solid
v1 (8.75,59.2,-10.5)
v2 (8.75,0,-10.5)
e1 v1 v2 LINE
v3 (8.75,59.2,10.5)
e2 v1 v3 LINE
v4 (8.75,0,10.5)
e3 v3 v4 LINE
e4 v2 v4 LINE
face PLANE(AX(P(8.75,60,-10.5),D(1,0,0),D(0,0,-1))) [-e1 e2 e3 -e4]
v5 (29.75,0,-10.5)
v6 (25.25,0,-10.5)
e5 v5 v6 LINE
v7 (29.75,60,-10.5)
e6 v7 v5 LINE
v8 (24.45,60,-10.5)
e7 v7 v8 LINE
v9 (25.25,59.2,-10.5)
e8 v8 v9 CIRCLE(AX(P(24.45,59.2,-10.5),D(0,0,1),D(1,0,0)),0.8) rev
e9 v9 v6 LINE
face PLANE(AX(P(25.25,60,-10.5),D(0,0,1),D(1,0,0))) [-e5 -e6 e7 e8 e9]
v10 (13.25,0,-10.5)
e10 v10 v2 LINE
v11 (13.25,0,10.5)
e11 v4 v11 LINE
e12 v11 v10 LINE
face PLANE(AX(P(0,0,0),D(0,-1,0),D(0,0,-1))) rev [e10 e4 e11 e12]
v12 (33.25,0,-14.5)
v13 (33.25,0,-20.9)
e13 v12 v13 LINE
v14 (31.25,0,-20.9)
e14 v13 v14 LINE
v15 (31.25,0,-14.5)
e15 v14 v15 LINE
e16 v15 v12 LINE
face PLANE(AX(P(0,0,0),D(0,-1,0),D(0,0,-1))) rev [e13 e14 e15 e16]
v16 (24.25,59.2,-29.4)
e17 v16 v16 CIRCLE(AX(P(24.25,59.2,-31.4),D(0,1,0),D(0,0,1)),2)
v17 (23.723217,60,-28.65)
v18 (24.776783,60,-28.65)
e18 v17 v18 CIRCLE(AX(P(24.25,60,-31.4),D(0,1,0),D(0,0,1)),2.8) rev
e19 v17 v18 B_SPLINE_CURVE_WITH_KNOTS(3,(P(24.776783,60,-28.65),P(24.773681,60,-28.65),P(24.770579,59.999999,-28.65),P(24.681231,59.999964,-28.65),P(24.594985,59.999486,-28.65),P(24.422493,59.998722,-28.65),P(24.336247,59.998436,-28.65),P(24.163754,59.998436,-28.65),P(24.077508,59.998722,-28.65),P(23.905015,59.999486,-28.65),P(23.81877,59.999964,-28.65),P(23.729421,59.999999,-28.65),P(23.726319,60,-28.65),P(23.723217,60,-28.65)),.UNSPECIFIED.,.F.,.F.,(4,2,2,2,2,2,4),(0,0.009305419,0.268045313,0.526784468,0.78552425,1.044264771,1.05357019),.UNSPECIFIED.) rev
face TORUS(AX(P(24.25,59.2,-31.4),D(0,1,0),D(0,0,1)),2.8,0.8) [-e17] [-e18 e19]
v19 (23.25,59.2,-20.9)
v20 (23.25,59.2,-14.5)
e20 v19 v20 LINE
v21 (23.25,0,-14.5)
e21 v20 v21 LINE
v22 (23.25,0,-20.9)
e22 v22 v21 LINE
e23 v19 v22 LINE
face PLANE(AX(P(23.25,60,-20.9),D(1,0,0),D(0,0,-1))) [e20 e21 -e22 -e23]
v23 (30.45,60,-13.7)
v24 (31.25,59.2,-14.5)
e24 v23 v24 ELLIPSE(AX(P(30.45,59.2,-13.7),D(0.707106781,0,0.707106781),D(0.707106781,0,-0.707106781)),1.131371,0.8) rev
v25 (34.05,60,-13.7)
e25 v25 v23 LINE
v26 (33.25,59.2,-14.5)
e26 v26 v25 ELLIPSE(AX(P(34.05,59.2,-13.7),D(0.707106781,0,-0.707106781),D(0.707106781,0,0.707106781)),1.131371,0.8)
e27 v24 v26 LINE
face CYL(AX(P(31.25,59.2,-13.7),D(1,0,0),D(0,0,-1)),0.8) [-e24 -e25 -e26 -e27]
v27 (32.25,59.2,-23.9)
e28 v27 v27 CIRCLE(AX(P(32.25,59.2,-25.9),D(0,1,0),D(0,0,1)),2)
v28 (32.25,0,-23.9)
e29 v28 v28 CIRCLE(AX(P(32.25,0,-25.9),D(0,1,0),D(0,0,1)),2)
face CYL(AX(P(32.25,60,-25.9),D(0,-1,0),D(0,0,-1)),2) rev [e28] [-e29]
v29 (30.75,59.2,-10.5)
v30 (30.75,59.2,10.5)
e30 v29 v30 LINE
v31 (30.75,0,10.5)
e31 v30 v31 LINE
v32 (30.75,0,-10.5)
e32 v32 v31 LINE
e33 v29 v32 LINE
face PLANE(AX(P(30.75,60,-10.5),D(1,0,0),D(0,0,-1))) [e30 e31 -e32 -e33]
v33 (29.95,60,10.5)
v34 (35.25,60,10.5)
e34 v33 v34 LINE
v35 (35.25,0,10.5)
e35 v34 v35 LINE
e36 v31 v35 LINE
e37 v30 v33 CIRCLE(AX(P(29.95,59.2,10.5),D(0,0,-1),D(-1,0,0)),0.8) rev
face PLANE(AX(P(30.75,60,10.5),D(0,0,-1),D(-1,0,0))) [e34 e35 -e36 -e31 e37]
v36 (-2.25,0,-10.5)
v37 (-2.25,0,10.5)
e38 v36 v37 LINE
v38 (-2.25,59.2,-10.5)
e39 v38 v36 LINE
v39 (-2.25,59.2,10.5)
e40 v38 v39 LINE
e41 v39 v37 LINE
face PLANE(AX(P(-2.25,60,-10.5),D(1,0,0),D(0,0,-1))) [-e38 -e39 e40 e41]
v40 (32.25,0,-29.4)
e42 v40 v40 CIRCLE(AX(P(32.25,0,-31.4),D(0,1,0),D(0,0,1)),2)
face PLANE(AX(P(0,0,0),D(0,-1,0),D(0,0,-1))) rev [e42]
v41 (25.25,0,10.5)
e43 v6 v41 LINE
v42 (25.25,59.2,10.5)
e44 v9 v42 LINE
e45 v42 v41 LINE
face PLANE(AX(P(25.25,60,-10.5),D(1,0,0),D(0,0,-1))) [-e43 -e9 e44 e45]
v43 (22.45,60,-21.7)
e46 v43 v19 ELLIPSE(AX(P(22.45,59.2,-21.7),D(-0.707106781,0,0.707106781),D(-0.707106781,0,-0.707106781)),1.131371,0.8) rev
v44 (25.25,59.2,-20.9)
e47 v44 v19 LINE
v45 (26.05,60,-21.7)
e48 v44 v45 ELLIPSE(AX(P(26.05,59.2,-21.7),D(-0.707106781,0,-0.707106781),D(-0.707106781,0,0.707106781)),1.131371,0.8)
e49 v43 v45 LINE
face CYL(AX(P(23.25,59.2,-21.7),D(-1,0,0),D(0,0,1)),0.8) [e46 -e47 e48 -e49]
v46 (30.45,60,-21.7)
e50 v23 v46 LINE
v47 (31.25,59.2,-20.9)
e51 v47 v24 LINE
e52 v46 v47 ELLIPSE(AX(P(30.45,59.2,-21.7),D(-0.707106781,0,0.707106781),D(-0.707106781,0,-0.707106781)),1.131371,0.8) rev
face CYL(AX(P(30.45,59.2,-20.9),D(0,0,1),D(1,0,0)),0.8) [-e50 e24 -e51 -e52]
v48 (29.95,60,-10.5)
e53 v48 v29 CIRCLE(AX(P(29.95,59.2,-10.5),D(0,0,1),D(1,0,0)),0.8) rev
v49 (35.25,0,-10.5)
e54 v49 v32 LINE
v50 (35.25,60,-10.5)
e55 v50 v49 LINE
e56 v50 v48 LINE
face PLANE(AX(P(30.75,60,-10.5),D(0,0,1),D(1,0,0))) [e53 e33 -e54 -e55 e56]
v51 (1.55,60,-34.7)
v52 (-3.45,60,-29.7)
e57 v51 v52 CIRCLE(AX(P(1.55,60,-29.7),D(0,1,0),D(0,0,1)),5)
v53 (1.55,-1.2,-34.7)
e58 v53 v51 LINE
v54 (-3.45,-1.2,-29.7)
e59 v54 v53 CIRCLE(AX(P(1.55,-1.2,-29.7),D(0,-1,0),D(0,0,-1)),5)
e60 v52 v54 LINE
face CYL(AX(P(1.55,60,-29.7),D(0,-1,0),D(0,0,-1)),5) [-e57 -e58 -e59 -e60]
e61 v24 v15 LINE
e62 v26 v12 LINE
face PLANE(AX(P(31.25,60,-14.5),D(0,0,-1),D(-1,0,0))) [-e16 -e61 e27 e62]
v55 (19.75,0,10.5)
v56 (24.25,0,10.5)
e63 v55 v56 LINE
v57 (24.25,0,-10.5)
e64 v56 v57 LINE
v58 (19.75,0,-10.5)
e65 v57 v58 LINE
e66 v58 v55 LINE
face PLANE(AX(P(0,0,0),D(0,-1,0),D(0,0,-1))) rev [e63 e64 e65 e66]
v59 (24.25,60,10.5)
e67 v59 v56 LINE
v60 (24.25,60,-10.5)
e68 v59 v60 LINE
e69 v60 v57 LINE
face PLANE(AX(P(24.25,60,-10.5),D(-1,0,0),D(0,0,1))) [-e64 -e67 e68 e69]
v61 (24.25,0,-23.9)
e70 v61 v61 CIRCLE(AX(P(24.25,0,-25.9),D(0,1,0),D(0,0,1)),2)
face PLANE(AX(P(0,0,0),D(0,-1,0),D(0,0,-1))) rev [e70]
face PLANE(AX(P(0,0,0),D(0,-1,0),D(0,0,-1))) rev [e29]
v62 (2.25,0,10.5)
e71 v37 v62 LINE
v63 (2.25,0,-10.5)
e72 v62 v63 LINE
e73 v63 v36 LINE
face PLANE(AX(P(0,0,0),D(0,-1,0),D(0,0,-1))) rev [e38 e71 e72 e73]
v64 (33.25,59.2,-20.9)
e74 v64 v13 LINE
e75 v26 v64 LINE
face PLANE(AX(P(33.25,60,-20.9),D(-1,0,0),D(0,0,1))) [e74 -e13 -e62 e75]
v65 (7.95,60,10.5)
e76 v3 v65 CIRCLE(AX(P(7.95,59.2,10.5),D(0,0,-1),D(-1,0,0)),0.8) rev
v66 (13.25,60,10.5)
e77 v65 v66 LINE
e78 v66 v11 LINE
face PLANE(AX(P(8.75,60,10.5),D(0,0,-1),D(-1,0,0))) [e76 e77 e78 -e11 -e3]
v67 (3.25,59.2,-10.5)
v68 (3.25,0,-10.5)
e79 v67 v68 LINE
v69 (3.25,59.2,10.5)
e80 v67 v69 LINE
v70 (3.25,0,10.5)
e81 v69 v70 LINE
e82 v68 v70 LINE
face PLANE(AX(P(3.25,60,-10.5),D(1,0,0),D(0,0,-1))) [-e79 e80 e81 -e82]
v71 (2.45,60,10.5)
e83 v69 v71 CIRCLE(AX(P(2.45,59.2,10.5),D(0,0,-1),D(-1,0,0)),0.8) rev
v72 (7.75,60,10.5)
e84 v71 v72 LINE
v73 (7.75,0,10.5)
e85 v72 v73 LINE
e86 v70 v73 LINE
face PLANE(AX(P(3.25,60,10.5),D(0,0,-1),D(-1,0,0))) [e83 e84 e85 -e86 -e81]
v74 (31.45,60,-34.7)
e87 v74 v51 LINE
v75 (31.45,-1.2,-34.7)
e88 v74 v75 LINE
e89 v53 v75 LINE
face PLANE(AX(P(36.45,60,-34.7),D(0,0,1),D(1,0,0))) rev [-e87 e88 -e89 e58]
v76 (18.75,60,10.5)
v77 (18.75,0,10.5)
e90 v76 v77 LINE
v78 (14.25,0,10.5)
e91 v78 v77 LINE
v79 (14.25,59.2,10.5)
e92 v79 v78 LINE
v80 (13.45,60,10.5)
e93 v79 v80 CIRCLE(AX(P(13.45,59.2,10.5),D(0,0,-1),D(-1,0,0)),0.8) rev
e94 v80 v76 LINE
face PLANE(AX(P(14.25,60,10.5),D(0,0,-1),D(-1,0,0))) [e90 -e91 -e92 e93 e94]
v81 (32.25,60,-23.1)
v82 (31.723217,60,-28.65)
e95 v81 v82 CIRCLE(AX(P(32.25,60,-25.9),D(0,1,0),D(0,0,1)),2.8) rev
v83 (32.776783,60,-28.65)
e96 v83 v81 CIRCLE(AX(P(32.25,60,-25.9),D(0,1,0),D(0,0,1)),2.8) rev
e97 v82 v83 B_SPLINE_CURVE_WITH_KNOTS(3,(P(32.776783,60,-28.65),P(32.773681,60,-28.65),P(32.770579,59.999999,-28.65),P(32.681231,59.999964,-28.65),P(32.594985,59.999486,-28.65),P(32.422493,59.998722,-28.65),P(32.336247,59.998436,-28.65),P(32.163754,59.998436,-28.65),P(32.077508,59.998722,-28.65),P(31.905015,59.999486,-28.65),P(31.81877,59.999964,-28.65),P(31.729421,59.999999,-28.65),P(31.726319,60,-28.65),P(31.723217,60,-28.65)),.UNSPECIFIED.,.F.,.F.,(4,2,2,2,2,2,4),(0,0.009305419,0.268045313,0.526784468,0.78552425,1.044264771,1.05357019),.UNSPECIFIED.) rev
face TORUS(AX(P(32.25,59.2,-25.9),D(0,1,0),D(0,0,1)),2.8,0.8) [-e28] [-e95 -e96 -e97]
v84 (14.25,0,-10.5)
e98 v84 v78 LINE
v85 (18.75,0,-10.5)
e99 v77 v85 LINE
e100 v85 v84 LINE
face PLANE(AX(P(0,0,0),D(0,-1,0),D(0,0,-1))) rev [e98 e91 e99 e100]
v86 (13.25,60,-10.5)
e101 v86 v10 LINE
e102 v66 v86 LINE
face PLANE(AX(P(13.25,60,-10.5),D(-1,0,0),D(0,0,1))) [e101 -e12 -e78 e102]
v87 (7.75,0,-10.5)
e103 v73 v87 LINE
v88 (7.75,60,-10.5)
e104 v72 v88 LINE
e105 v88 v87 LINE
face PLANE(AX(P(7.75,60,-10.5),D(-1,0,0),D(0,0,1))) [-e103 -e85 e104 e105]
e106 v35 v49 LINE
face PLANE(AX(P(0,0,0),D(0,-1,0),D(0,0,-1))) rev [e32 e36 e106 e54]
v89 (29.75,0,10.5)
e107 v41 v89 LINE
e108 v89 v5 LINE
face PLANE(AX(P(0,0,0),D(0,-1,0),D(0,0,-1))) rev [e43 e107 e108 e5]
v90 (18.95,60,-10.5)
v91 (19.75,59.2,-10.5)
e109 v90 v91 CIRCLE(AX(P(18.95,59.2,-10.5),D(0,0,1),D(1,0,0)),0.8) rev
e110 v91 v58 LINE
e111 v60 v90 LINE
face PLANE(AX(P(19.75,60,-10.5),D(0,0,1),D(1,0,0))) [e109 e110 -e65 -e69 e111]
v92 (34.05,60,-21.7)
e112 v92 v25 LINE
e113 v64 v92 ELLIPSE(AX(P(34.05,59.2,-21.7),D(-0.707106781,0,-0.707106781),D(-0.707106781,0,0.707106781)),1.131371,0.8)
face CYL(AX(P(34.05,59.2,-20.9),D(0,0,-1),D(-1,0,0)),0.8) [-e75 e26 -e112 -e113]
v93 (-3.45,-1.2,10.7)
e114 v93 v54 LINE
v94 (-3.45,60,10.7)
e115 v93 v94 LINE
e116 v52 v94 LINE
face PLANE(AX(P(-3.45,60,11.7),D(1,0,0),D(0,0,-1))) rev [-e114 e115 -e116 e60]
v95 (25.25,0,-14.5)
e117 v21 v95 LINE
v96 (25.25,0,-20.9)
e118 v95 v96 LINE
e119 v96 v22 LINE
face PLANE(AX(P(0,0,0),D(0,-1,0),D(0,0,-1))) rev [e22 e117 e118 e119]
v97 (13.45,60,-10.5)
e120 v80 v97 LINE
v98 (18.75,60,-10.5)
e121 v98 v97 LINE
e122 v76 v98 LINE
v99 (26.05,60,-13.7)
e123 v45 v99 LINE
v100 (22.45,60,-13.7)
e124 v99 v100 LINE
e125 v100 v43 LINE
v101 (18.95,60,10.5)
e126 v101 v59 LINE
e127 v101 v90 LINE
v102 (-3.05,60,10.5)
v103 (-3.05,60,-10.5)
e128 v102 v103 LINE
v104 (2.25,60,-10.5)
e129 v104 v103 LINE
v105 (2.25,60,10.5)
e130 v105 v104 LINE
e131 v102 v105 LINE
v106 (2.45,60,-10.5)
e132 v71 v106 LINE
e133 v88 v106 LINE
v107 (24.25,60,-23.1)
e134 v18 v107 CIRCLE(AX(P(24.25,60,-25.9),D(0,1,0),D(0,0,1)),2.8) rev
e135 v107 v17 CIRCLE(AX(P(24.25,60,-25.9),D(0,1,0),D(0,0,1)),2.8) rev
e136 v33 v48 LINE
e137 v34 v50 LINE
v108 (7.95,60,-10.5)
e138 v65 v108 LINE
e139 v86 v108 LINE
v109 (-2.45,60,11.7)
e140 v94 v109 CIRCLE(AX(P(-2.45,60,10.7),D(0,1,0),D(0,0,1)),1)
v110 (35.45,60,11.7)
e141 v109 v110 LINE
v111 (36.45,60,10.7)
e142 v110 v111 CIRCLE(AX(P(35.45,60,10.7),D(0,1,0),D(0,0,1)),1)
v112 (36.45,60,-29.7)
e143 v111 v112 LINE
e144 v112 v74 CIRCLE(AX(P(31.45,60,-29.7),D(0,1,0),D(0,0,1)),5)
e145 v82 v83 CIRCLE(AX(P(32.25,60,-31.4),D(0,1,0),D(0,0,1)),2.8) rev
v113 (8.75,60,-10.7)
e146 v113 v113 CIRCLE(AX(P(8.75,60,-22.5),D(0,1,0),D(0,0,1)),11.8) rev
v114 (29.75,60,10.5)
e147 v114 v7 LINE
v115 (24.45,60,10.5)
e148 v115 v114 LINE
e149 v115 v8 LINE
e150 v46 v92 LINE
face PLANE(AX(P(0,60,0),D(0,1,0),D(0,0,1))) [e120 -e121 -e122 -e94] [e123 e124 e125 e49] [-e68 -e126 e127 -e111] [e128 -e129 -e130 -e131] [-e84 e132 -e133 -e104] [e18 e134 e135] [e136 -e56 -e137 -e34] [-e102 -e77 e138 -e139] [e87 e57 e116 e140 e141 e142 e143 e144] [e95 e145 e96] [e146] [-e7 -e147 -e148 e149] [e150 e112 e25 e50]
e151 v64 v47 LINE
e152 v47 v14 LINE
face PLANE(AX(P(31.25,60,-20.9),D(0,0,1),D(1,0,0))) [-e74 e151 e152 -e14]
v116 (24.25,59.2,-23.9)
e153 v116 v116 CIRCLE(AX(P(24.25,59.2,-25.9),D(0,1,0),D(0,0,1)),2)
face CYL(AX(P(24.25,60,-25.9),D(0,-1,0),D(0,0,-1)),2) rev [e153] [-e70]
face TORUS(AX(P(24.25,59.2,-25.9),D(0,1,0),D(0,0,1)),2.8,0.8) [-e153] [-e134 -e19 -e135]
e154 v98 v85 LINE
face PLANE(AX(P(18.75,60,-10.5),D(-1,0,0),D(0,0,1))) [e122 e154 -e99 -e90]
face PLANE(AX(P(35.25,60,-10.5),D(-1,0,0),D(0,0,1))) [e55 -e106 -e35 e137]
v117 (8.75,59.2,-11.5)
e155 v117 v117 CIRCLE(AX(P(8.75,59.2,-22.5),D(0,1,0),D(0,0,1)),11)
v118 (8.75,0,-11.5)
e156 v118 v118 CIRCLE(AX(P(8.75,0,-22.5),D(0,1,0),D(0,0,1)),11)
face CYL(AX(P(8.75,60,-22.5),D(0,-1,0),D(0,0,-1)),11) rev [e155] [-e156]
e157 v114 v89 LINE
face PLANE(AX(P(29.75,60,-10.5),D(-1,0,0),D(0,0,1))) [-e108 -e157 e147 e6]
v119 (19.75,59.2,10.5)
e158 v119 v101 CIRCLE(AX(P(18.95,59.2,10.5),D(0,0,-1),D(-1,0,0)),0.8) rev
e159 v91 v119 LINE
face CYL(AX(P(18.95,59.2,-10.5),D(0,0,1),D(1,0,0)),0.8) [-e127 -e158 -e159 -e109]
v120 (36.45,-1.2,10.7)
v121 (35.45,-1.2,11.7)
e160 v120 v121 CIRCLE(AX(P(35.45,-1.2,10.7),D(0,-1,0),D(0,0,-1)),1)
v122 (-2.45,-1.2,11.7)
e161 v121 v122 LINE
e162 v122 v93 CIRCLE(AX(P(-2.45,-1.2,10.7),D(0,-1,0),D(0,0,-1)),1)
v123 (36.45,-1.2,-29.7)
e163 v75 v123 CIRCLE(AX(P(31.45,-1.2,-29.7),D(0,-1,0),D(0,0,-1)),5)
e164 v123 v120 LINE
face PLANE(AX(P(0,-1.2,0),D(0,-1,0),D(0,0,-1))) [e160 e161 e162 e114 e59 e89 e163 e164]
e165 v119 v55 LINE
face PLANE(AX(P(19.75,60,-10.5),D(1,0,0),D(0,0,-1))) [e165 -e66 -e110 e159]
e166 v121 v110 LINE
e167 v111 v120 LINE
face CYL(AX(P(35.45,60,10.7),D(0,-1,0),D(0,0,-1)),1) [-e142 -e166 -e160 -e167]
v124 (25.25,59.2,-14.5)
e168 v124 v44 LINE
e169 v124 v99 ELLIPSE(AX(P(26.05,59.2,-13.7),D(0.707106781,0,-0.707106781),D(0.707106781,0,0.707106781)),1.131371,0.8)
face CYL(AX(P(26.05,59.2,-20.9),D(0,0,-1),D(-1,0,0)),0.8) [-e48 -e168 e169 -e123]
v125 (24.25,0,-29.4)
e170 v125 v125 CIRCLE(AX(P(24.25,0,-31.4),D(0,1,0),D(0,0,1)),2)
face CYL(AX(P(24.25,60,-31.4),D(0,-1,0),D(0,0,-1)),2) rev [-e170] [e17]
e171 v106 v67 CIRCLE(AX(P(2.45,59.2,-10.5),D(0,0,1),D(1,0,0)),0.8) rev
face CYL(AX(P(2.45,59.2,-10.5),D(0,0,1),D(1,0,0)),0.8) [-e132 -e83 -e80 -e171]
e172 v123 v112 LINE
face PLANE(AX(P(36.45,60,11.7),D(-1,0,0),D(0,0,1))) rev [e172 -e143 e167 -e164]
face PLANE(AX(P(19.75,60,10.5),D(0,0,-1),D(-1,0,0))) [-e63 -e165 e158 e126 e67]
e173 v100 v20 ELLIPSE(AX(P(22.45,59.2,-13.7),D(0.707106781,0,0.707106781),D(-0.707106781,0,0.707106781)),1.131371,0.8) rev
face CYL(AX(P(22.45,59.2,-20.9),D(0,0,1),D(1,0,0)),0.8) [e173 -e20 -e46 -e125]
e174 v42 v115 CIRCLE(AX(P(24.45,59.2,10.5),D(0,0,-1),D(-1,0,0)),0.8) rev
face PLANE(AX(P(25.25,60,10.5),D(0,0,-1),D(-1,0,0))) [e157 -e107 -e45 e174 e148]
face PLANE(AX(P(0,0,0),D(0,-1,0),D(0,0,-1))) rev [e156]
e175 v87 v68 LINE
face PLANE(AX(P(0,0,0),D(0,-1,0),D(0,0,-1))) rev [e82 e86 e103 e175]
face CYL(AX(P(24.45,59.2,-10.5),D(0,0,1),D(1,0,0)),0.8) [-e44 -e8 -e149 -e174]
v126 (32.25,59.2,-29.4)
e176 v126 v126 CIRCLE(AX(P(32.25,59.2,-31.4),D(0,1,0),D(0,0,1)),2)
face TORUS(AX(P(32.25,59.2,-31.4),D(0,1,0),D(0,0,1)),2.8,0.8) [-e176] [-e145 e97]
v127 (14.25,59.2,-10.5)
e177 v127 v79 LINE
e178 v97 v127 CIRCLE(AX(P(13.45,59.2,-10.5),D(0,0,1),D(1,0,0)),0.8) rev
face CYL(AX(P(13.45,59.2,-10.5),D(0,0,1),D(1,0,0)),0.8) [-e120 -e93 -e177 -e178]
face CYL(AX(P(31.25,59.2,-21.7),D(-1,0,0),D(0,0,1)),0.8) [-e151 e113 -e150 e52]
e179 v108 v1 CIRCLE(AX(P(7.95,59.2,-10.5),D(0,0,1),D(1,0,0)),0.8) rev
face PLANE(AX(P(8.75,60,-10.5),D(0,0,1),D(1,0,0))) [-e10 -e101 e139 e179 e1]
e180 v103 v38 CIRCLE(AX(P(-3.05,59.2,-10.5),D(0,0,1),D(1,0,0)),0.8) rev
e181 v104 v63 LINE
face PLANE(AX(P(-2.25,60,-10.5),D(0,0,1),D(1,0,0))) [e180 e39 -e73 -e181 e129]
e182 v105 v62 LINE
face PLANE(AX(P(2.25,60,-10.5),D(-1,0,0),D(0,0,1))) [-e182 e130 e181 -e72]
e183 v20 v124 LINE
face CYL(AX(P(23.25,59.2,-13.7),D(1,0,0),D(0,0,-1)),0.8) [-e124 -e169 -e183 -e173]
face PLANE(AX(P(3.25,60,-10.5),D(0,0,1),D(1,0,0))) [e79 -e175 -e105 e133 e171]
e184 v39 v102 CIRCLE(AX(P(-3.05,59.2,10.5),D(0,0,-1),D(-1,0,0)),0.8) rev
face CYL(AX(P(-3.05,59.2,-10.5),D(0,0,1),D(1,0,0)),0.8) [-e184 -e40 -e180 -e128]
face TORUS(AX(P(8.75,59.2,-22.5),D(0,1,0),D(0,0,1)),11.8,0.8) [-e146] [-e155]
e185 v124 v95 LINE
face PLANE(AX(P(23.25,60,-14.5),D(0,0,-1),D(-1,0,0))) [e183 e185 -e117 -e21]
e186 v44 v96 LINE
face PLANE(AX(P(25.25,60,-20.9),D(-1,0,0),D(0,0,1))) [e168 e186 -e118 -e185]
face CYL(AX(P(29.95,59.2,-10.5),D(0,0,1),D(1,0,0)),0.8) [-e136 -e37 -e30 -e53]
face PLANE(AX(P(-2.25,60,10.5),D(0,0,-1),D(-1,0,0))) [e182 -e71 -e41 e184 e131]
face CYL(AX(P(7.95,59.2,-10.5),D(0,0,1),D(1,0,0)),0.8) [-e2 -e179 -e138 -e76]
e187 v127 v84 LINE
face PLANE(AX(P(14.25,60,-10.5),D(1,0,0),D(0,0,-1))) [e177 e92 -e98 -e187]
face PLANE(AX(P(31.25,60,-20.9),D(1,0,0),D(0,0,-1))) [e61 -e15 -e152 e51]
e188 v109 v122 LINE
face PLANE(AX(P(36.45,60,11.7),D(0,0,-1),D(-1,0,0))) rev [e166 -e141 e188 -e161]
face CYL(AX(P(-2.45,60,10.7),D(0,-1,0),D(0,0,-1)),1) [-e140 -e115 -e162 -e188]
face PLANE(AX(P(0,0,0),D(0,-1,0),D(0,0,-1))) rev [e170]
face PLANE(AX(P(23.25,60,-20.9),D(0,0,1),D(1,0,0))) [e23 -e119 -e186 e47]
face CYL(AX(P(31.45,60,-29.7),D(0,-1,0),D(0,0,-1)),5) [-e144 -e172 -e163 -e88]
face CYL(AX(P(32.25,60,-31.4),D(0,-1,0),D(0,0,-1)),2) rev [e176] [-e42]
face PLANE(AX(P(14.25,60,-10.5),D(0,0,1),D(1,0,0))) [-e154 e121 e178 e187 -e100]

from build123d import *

# Parameters (mm, degrees)
SKETCH_1_W      = 39.9
SKETCH_1_H      = 46.4
SKETCH_1_R      = 11
SKETCH_1_R_2    = 2
SKETCH_1_W_2    = 4.5
SKETCH_1_H_2    = 21
SKETCH_1_W_3    = 2
SKETCH_1_H_3    = 6.4
EXTRUDE_1_DEPTH = 60
SKETCH_2_W      = 39.9
SKETCH_2_H      = 46.4
EXTRUDE_2_DEPTH = 1.2
FILLET_1_R      = 1
FILLET_2_R      = 5
FILLET_3_R      = 0.8


with BuildPart() as part:
    # 草图1 → 凸台-拉伸1 (new body)
    with BuildSketch(Plane(origin=(0, 0, 0), x_dir=(1, 0, 0), z_dir=(0, 1, 0))):
        with Locations((16.5, 11.5)):
            Rectangle(SKETCH_1_W, SKETCH_1_H)
        with Locations(Location((8.75, 22.5, 0), (0, 0, 270))):
            Circle(SKETCH_1_R, mode=Mode.SUBTRACT)
        with Locations(Location((24.25, 25.9, 0), (0, 0, 270))):
            Circle(SKETCH_1_R_2, mode=Mode.SUBTRACT)
        with Locations(Location((32.25, 25.9, 0), (0, 0, 270))):
            Circle(SKETCH_1_R_2, mode=Mode.SUBTRACT)
        with Locations(Location((24.25, 31.4, 0), (0, 0, 270))):
            Circle(SKETCH_1_R_2, mode=Mode.SUBTRACT)
        with Locations(Location((32.25, 31.4, 0), (0, 0, 270))):
            Circle(SKETCH_1_R_2, mode=Mode.SUBTRACT)
        with Locations((5.5, 0)):
            Rectangle(SKETCH_1_W_2, SKETCH_1_H_2, mode=Mode.SUBTRACT)
        Rectangle(SKETCH_1_W_2, SKETCH_1_H_2, mode=Mode.SUBTRACT)
        with Locations((11, 0)):
            Rectangle(SKETCH_1_W_2, SKETCH_1_H_2, mode=Mode.SUBTRACT)
        with Locations((16.5, 0)):
            Rectangle(SKETCH_1_W_2, SKETCH_1_H_2, mode=Mode.SUBTRACT)
        with Locations((22, 0)):
            Rectangle(SKETCH_1_W_2, SKETCH_1_H_2, mode=Mode.SUBTRACT)
        with Locations((27.5, 0)):
            Rectangle(SKETCH_1_W_2, SKETCH_1_H_2, mode=Mode.SUBTRACT)
        with Locations((24.25, 17.7)):
            Rectangle(SKETCH_1_W_3, SKETCH_1_H_3, mode=Mode.SUBTRACT)
        with Locations((33, 0)):
            Rectangle(SKETCH_1_W_2, SKETCH_1_H_2, mode=Mode.SUBTRACT)
        with Locations((32.25, 17.7)):
            Rectangle(SKETCH_1_W_3, SKETCH_1_H_3, mode=Mode.SUBTRACT)
    extrude(amount=EXTRUDE_1_DEPTH)

    # 草图2 → 凸台-拉伸2 (add)
    with BuildSketch(Plane.XZ):
        with Locations((16.5, -11.5)):
            Rectangle(SKETCH_2_W, SKETCH_2_H)
    extrude(amount=EXTRUDE_2_DEPTH)

    # 圆角1
    fillet_1_edges = [part.edges().sort_by_distance(p)[0] for p in [
        (36.45, 29.4, 11.7),
        (-3.45, 29.4, 11.7),
    ]]
    fillet(fillet_1_edges, radius=FILLET_1_R)

    # 圆角2
    fillet_2_edges = [part.edges().sort_by_distance(p)[0] for p in [
        (-3.45, 29.4, -34.7),
        (36.45, 29.4, -34.7),
    ]]
    fillet(fillet_2_edges, radius=FILLET_2_R)

    # 圆角3
    # the kernel refuses this fillet: 0.8 mm, written as the material it takes off along each edge
    with BuildSketch(Plane(origin=(31.25, 60, -14.5), x_dir=(-1, 0, 0), z_dir=(0, 0, -1)), Plane(origin=(33.25, 60, -20.9), x_dir=(1, 0, 0), z_dir=(0, 0, 1)), Plane(origin=(23.25, 60, -14.5), x_dir=(-1, 0, 0), z_dir=(0, 0, -1)), Plane(origin=(25.25, 60, -20.9), x_dir=(1, 0, 0), z_dir=(0, 0, 1))) as fillet_3_piece_1:
        with BuildLine():
            CenterArc((FILLET_3_R, -FILLET_3_R), FILLET_3_R, 90, 90)
            Line((0, -FILLET_3_R), (0, 0))
            Line((0, 0), (FILLET_3_R, 0))
        make_face()
    extrude(amount=6.4, mode=Mode.SUBTRACT)
    with BuildSketch(Plane(origin=(33.25, 60, -14.5), x_dir=(0, 0, 1), z_dir=(-1, 0, 0)), Plane(origin=(31.25, 60, -20.9), x_dir=(0, 0, -1), z_dir=(1, 0, 0)), Plane(origin=(25.25, 60, -14.5), x_dir=(0, 0, 1), z_dir=(-1, 0, 0)), Plane(origin=(23.25, 60, -20.9), x_dir=(0, 0, -1), z_dir=(1, 0, 0))) as fillet_3_piece_2:
        with BuildLine():
            CenterArc((FILLET_3_R, -FILLET_3_R), FILLET_3_R, 90, 90)
            Line((0, -FILLET_3_R), (0, 0))
            Line((0, 0), (FILLET_3_R, 0))
        make_face()
    extrude(amount=2, mode=Mode.SUBTRACT)
    with BuildSketch(Plane(origin=(24.25, 60, -25.9), x_dir=(0, 0, 1), z_dir=(-1, 0, 0))) as fillet_3_piece_3:
        with BuildLine():
            CenterArc((2 + FILLET_3_R, -FILLET_3_R), FILLET_3_R, 90, 90)
            Line((2, -FILLET_3_R), (2, 0))
            Line((2, 0), (2 + FILLET_3_R, 0))
        make_face()
    revolve(axis=Axis((24.25, 60, -25.9), (0, 1, 0)), mode=Mode.SUBTRACT)
    with BuildSketch(Plane(origin=(32.25, 60, -25.9), x_dir=(0, 0, 1), z_dir=(-1, 0, 0))) as fillet_3_piece_4:
        with BuildLine():
            CenterArc((2 + FILLET_3_R, -FILLET_3_R), FILLET_3_R, 90, 90)
            Line((2, -FILLET_3_R), (2, 0))
            Line((2, 0), (2 + FILLET_3_R, 0))
        make_face()
    revolve(axis=Axis((32.25, 60, -25.9), (0, 1, 0)), mode=Mode.SUBTRACT)
    with BuildSketch(Plane(origin=(30.75, 60, 10.5), x_dir=(-1, 0, 0), z_dir=(0, 0, -1)), Plane(origin=(-2.25, 60, 10.5), x_dir=(-1, 0, 0), z_dir=(0, 0, -1)), Plane(origin=(3.25, 60, 10.5), x_dir=(-1, 0, 0), z_dir=(0, 0, -1)), Plane(origin=(8.75, 60, 10.5), x_dir=(-1, 0, 0), z_dir=(0, 0, -1)), Plane(origin=(14.25, 60, 10.5), x_dir=(-1, 0, 0), z_dir=(0, 0, -1)), Plane(origin=(19.75, 60, 10.5), x_dir=(-1, 0, 0), z_dir=(0, 0, -1)), Plane(origin=(25.25, 60, 10.5), x_dir=(-1, 0, 0), z_dir=(0, 0, -1))) as fillet_3_piece_5:
        with BuildLine():
            CenterArc((FILLET_3_R, -FILLET_3_R), FILLET_3_R, 90, 90)
            Line((0, -FILLET_3_R), (0, 0))
            Line((0, 0), (FILLET_3_R, 0))
        make_face()
    extrude(amount=21, mode=Mode.SUBTRACT)
    with BuildSketch(Plane(origin=(24.25, 60, -31.4), x_dir=(0, 0, 1), z_dir=(-1, 0, 0))) as fillet_3_piece_6:
        with BuildLine():
            CenterArc((2 + FILLET_3_R, -FILLET_3_R), FILLET_3_R, 90, 90)
            Line((2, -FILLET_3_R), (2, 0))
            Line((2, 0), (2 + FILLET_3_R, 0))
        make_face()
    revolve(axis=Axis((24.25, 60, -31.4), (0, 1, 0)), mode=Mode.SUBTRACT)
    with BuildSketch(Plane(origin=(32.25, 60, -31.4), x_dir=(0, 0, 1), z_dir=(-1, 0, 0))) as fillet_3_piece_7:
        with BuildLine():
            CenterArc((2 + FILLET_3_R, -FILLET_3_R), FILLET_3_R, 90, 90)
            Line((2, -FILLET_3_R), (2, 0))
            Line((2, 0), (2 + FILLET_3_R, 0))
        make_face()
    revolve(axis=Axis((32.25, 60, -31.4), (0, 1, 0)), mode=Mode.SUBTRACT)
    with BuildSketch(Plane(origin=(8.75, 60, -22.5), x_dir=(0, 0, 1), z_dir=(-1, 0, 0))) as fillet_3_piece_8:
        with BuildLine():
            CenterArc((11 + FILLET_3_R, -FILLET_3_R), FILLET_3_R, 90, 90)
            Line((11, -FILLET_3_R), (11, 0))
            Line((11, 0), (11 + FILLET_3_R, 0))
        make_face()
    revolve(axis=Axis((8.75, 60, -22.5), (0, 1, 0)), mode=Mode.SUBTRACT)
    with BuildSketch(Plane(origin=(31.25, 60, -12.5), x_dir=(-1, 0, 0), z_dir=(0, 0, -1))) as fillet_3_piece_9a_section:
        with BuildLine():
            CenterArc((FILLET_3_R, -FILLET_3_R), FILLET_3_R, 90, 90)
            Line((0, -FILLET_3_R), (0, 0))
            Line((0, 0), (FILLET_3_R, 0))
        make_face()
    fillet_3_piece_9a = extrude(amount=8.4, mode=Mode.PRIVATE)
    fillet_3_piece_9a = split(fillet_3_piece_9a, bisect_by=Plane(origin=(31.068883909, 59.818883909, -14.5), z_dir=(0, 0, 1)), keep=Keep.TOP, mode=Mode.PRIVATE)
    with BuildSketch(Plane(origin=(33.25, 60, -14.5), x_dir=(0, 0, 1), z_dir=(-1, 0, 0))) as fillet_3_piece_9b_section:
        with BuildLine():
            CenterArc((FILLET_3_R, -FILLET_3_R), FILLET_3_R, 90, 90)
            Line((0, -FILLET_3_R), (0, 0))
            Line((0, 0), (FILLET_3_R, 0))
        make_face()
    fillet_3_piece_9b = extrude(amount=4, mode=Mode.PRIVATE)
    fillet_3_piece_9b = split(fillet_3_piece_9b, bisect_by=Plane(origin=(31.25, 59.818883909, -14.318883909), z_dir=(-1, 0, 0)), keep=Keep.TOP, mode=Mode.PRIVATE)
    fillet_3_piece_9 = fillet_3_piece_9a & fillet_3_piece_9b
    add(fillet_3_piece_9, mode=Mode.SUBTRACT)
    with BuildSketch(Plane(origin=(29.25, 60, -20.9), x_dir=(0, 0, -1), z_dir=(1, 0, 0))) as fillet_3_piece_10a_section:
        with BuildLine():
            CenterArc((FILLET_3_R, -FILLET_3_R), FILLET_3_R, 90, 90)
            Line((0, -FILLET_3_R), (0, 0))
            Line((0, 0), (FILLET_3_R, 0))
        make_face()
    fillet_3_piece_10a = extrude(amount=4, mode=Mode.PRIVATE)
    fillet_3_piece_10a = split(fillet_3_piece_10a, bisect_by=Plane(origin=(31.25, 59.818883909, -21.081116091), z_dir=(-1, 0, 0)), keep=Keep.TOP, mode=Mode.PRIVATE)
    with BuildSketch(Plane(origin=(31.25, 60, -14.5), x_dir=(-1, 0, 0), z_dir=(0, 0, -1))) as fillet_3_piece_10b_section:
        with BuildLine():
            CenterArc((FILLET_3_R, -FILLET_3_R), FILLET_3_R, 90, 90)
            Line((0, -FILLET_3_R), (0, 0))
            Line((0, 0), (FILLET_3_R, 0))
        make_face()
    fillet_3_piece_10b = extrude(amount=8.4, mode=Mode.PRIVATE)
    fillet_3_piece_10b = split(fillet_3_piece_10b, bisect_by=Plane(origin=(31.068883909, 59.818883909, -20.9), z_dir=(0, 0, -1)), keep=Keep.TOP, mode=Mode.PRIVATE)
    fillet_3_piece_10 = fillet_3_piece_10a & fillet_3_piece_10b
    add(fillet_3_piece_10, mode=Mode.SUBTRACT)
    with BuildSketch(Plane(origin=(35.25, 60, -14.5), x_dir=(0, 0, 1), z_dir=(-1, 0, 0))) as fillet_3_piece_11a_section:
        with BuildLine():
            CenterArc((FILLET_3_R, -FILLET_3_R), FILLET_3_R, 90, 90)
            Line((0, -FILLET_3_R), (0, 0))
            Line((0, 0), (FILLET_3_R, 0))
        make_face()
    fillet_3_piece_11a = extrude(amount=4, mode=Mode.PRIVATE)
    fillet_3_piece_11a = split(fillet_3_piece_11a, bisect_by=Plane(origin=(33.25, 59.818883909, -14.318883909), z_dir=(1, 0, 0)), keep=Keep.TOP, mode=Mode.PRIVATE)
    with BuildSketch(Plane(origin=(33.25, 60, -20.9), x_dir=(1, 0, 0), z_dir=(0, 0, 1))) as fillet_3_piece_11b_section:
        with BuildLine():
            CenterArc((FILLET_3_R, -FILLET_3_R), FILLET_3_R, 90, 90)
            Line((0, -FILLET_3_R), (0, 0))
            Line((0, 0), (FILLET_3_R, 0))
        make_face()
    fillet_3_piece_11b = extrude(amount=8.4, mode=Mode.PRIVATE)
    fillet_3_piece_11b = split(fillet_3_piece_11b, bisect_by=Plane(origin=(33.431116091, 59.818883909, -14.5), z_dir=(0, 0, 1)), keep=Keep.TOP, mode=Mode.PRIVATE)
    fillet_3_piece_11 = fillet_3_piece_11a & fillet_3_piece_11b
    add(fillet_3_piece_11, mode=Mode.SUBTRACT)
    with BuildSketch(Plane(origin=(31.25, 60, -20.9), x_dir=(0, 0, -1), z_dir=(1, 0, 0))) as fillet_3_piece_12a_section:
        with BuildLine():
            CenterArc((FILLET_3_R, -FILLET_3_R), FILLET_3_R, 90, 90)
            Line((0, -FILLET_3_R), (0, 0))
            Line((0, 0), (FILLET_3_R, 0))
        make_face()
    fillet_3_piece_12a = extrude(amount=4, mode=Mode.PRIVATE)
    fillet_3_piece_12a = split(fillet_3_piece_12a, bisect_by=Plane(origin=(33.25, 59.818883909, -21.081116091), z_dir=(1, 0, 0)), keep=Keep.TOP, mode=Mode.PRIVATE)
    with BuildSketch(Plane(origin=(33.25, 60, -22.9), x_dir=(1, 0, 0), z_dir=(0, 0, 1))) as fillet_3_piece_12b_section:
        with BuildLine():
            CenterArc((FILLET_3_R, -FILLET_3_R), FILLET_3_R, 90, 90)
            Line((0, -FILLET_3_R), (0, 0))
            Line((0, 0), (FILLET_3_R, 0))
        make_face()
    fillet_3_piece_12b = extrude(amount=8.4, mode=Mode.PRIVATE)
    fillet_3_piece_12b = split(fillet_3_piece_12b, bisect_by=Plane(origin=(33.431116091, 59.818883909, -20.9), z_dir=(0, 0, -1)), keep=Keep.TOP, mode=Mode.PRIVATE)
    fillet_3_piece_12 = fillet_3_piece_12a & fillet_3_piece_12b
    add(fillet_3_piece_12, mode=Mode.SUBTRACT)
    with BuildSketch(Plane(origin=(23.25, 60, -12.5), x_dir=(-1, 0, 0), z_dir=(0, 0, -1))) as fillet_3_piece_13a_section:
        with BuildLine():
            CenterArc((FILLET_3_R, -FILLET_3_R), FILLET_3_R, 90, 90)
            Line((0, -FILLET_3_R), (0, 0))
            Line((0, 0), (FILLET_3_R, 0))
        make_face()
    fillet_3_piece_13a = extrude(amount=8.4, mode=Mode.PRIVATE)
    fillet_3_piece_13a = split(fillet_3_piece_13a, bisect_by=Plane(origin=(23.068883909, 59.818883909, -14.5), z_dir=(0, 0, 1)), keep=Keep.TOP, mode=Mode.PRIVATE)
    with BuildSketch(Plane(origin=(25.25, 60, -14.5), x_dir=(0, 0, 1), z_dir=(-1, 0, 0))) as fillet_3_piece_13b_section:
        with BuildLine():
            CenterArc((FILLET_3_R, -FILLET_3_R), FILLET_3_R, 90, 90)
            Line((0, -FILLET_3_R), (0, 0))
            Line((0, 0), (FILLET_3_R, 0))
        make_face()
    fillet_3_piece_13b = extrude(amount=4, mode=Mode.PRIVATE)
    fillet_3_piece_13b = split(fillet_3_piece_13b, bisect_by=Plane(origin=(23.25, 59.818883909, -14.318883909), z_dir=(-1, 0, 0)), keep=Keep.TOP, mode=Mode.PRIVATE)
    fillet_3_piece_13 = fillet_3_piece_13a & fillet_3_piece_13b
    add(fillet_3_piece_13, mode=Mode.SUBTRACT)
    with BuildSketch(Plane(origin=(23.25, 60, -14.5), x_dir=(-1, 0, 0), z_dir=(0, 0, -1))) as fillet_3_piece_14a_section:
        with BuildLine():
            CenterArc((FILLET_3_R, -FILLET_3_R), FILLET_3_R, 90, 90)
            Line((0, -FILLET_3_R), (0, 0))
            Line((0, 0), (FILLET_3_R, 0))
        make_face()
    fillet_3_piece_14a = extrude(amount=8.4, mode=Mode.PRIVATE)
    fillet_3_piece_14a = split(fillet_3_piece_14a, bisect_by=Plane(origin=(23.068883909, 59.818883909, -20.9), z_dir=(0, 0, -1)), keep=Keep.TOP, mode=Mode.PRIVATE)
    with BuildSketch(Plane(origin=(21.25, 60, -20.9), x_dir=(0, 0, -1), z_dir=(1, 0, 0))) as fillet_3_piece_14b_section:
        with BuildLine():
            CenterArc((FILLET_3_R, -FILLET_3_R), FILLET_3_R, 90, 90)
            Line((0, -FILLET_3_R), (0, 0))
            Line((0, 0), (FILLET_3_R, 0))
        make_face()
    fillet_3_piece_14b = extrude(amount=4, mode=Mode.PRIVATE)
    fillet_3_piece_14b = split(fillet_3_piece_14b, bisect_by=Plane(origin=(23.25, 59.818883909, -21.081116091), z_dir=(-1, 0, 0)), keep=Keep.TOP, mode=Mode.PRIVATE)
    fillet_3_piece_14 = fillet_3_piece_14a & fillet_3_piece_14b
    add(fillet_3_piece_14, mode=Mode.SUBTRACT)
    with BuildSketch(Plane(origin=(27.25, 60, -14.5), x_dir=(0, 0, 1), z_dir=(-1, 0, 0))) as fillet_3_piece_15a_section:
        with BuildLine():
            CenterArc((FILLET_3_R, -FILLET_3_R), FILLET_3_R, 90, 90)
            Line((0, -FILLET_3_R), (0, 0))
            Line((0, 0), (FILLET_3_R, 0))
        make_face()
    fillet_3_piece_15a = extrude(amount=4, mode=Mode.PRIVATE)
    fillet_3_piece_15a = split(fillet_3_piece_15a, bisect_by=Plane(origin=(25.25, 59.818883909, -14.318883909), z_dir=(1, 0, 0)), keep=Keep.TOP, mode=Mode.PRIVATE)
    with BuildSketch(Plane(origin=(25.25, 60, -20.9), x_dir=(1, 0, 0), z_dir=(0, 0, 1))) as fillet_3_piece_15b_section:
        with BuildLine():
            CenterArc((FILLET_3_R, -FILLET_3_R), FILLET_3_R, 90, 90)
            Line((0, -FILLET_3_R), (0, 0))
            Line((0, 0), (FILLET_3_R, 0))
        make_face()
    fillet_3_piece_15b = extrude(amount=8.4, mode=Mode.PRIVATE)
    fillet_3_piece_15b = split(fillet_3_piece_15b, bisect_by=Plane(origin=(25.431116091, 59.818883909, -14.5), z_dir=(0, 0, 1)), keep=Keep.TOP, mode=Mode.PRIVATE)
    fillet_3_piece_15 = fillet_3_piece_15a & fillet_3_piece_15b
    add(fillet_3_piece_15, mode=Mode.SUBTRACT)
    with BuildSketch(Plane(origin=(25.25, 60, -22.9), x_dir=(1, 0, 0), z_dir=(0, 0, 1))) as fillet_3_piece_16a_section:
        with BuildLine():
            CenterArc((FILLET_3_R, -FILLET_3_R), FILLET_3_R, 90, 90)
            Line((0, -FILLET_3_R), (0, 0))
            Line((0, 0), (FILLET_3_R, 0))
        make_face()
    fillet_3_piece_16a = extrude(amount=8.4, mode=Mode.PRIVATE)
    fillet_3_piece_16a = split(fillet_3_piece_16a, bisect_by=Plane(origin=(25.431116091, 59.818883909, -20.9), z_dir=(0, 0, -1)), keep=Keep.TOP, mode=Mode.PRIVATE)
    with BuildSketch(Plane(origin=(23.25, 60, -20.9), x_dir=(0, 0, -1), z_dir=(1, 0, 0))) as fillet_3_piece_16b_section:
        with BuildLine():
            CenterArc((FILLET_3_R, -FILLET_3_R), FILLET_3_R, 90, 90)
            Line((0, -FILLET_3_R), (0, 0))
            Line((0, 0), (FILLET_3_R, 0))
        make_face()
    fillet_3_piece_16b = extrude(amount=4, mode=Mode.PRIVATE)
    fillet_3_piece_16b = split(fillet_3_piece_16b, bisect_by=Plane(origin=(25.25, 59.818883909, -21.081116091), z_dir=(1, 0, 0)), keep=Keep.TOP, mode=Mode.PRIVATE)
    fillet_3_piece_16 = fillet_3_piece_16a & fillet_3_piece_16b
    add(fillet_3_piece_16, mode=Mode.SUBTRACT)


solid = part.part
